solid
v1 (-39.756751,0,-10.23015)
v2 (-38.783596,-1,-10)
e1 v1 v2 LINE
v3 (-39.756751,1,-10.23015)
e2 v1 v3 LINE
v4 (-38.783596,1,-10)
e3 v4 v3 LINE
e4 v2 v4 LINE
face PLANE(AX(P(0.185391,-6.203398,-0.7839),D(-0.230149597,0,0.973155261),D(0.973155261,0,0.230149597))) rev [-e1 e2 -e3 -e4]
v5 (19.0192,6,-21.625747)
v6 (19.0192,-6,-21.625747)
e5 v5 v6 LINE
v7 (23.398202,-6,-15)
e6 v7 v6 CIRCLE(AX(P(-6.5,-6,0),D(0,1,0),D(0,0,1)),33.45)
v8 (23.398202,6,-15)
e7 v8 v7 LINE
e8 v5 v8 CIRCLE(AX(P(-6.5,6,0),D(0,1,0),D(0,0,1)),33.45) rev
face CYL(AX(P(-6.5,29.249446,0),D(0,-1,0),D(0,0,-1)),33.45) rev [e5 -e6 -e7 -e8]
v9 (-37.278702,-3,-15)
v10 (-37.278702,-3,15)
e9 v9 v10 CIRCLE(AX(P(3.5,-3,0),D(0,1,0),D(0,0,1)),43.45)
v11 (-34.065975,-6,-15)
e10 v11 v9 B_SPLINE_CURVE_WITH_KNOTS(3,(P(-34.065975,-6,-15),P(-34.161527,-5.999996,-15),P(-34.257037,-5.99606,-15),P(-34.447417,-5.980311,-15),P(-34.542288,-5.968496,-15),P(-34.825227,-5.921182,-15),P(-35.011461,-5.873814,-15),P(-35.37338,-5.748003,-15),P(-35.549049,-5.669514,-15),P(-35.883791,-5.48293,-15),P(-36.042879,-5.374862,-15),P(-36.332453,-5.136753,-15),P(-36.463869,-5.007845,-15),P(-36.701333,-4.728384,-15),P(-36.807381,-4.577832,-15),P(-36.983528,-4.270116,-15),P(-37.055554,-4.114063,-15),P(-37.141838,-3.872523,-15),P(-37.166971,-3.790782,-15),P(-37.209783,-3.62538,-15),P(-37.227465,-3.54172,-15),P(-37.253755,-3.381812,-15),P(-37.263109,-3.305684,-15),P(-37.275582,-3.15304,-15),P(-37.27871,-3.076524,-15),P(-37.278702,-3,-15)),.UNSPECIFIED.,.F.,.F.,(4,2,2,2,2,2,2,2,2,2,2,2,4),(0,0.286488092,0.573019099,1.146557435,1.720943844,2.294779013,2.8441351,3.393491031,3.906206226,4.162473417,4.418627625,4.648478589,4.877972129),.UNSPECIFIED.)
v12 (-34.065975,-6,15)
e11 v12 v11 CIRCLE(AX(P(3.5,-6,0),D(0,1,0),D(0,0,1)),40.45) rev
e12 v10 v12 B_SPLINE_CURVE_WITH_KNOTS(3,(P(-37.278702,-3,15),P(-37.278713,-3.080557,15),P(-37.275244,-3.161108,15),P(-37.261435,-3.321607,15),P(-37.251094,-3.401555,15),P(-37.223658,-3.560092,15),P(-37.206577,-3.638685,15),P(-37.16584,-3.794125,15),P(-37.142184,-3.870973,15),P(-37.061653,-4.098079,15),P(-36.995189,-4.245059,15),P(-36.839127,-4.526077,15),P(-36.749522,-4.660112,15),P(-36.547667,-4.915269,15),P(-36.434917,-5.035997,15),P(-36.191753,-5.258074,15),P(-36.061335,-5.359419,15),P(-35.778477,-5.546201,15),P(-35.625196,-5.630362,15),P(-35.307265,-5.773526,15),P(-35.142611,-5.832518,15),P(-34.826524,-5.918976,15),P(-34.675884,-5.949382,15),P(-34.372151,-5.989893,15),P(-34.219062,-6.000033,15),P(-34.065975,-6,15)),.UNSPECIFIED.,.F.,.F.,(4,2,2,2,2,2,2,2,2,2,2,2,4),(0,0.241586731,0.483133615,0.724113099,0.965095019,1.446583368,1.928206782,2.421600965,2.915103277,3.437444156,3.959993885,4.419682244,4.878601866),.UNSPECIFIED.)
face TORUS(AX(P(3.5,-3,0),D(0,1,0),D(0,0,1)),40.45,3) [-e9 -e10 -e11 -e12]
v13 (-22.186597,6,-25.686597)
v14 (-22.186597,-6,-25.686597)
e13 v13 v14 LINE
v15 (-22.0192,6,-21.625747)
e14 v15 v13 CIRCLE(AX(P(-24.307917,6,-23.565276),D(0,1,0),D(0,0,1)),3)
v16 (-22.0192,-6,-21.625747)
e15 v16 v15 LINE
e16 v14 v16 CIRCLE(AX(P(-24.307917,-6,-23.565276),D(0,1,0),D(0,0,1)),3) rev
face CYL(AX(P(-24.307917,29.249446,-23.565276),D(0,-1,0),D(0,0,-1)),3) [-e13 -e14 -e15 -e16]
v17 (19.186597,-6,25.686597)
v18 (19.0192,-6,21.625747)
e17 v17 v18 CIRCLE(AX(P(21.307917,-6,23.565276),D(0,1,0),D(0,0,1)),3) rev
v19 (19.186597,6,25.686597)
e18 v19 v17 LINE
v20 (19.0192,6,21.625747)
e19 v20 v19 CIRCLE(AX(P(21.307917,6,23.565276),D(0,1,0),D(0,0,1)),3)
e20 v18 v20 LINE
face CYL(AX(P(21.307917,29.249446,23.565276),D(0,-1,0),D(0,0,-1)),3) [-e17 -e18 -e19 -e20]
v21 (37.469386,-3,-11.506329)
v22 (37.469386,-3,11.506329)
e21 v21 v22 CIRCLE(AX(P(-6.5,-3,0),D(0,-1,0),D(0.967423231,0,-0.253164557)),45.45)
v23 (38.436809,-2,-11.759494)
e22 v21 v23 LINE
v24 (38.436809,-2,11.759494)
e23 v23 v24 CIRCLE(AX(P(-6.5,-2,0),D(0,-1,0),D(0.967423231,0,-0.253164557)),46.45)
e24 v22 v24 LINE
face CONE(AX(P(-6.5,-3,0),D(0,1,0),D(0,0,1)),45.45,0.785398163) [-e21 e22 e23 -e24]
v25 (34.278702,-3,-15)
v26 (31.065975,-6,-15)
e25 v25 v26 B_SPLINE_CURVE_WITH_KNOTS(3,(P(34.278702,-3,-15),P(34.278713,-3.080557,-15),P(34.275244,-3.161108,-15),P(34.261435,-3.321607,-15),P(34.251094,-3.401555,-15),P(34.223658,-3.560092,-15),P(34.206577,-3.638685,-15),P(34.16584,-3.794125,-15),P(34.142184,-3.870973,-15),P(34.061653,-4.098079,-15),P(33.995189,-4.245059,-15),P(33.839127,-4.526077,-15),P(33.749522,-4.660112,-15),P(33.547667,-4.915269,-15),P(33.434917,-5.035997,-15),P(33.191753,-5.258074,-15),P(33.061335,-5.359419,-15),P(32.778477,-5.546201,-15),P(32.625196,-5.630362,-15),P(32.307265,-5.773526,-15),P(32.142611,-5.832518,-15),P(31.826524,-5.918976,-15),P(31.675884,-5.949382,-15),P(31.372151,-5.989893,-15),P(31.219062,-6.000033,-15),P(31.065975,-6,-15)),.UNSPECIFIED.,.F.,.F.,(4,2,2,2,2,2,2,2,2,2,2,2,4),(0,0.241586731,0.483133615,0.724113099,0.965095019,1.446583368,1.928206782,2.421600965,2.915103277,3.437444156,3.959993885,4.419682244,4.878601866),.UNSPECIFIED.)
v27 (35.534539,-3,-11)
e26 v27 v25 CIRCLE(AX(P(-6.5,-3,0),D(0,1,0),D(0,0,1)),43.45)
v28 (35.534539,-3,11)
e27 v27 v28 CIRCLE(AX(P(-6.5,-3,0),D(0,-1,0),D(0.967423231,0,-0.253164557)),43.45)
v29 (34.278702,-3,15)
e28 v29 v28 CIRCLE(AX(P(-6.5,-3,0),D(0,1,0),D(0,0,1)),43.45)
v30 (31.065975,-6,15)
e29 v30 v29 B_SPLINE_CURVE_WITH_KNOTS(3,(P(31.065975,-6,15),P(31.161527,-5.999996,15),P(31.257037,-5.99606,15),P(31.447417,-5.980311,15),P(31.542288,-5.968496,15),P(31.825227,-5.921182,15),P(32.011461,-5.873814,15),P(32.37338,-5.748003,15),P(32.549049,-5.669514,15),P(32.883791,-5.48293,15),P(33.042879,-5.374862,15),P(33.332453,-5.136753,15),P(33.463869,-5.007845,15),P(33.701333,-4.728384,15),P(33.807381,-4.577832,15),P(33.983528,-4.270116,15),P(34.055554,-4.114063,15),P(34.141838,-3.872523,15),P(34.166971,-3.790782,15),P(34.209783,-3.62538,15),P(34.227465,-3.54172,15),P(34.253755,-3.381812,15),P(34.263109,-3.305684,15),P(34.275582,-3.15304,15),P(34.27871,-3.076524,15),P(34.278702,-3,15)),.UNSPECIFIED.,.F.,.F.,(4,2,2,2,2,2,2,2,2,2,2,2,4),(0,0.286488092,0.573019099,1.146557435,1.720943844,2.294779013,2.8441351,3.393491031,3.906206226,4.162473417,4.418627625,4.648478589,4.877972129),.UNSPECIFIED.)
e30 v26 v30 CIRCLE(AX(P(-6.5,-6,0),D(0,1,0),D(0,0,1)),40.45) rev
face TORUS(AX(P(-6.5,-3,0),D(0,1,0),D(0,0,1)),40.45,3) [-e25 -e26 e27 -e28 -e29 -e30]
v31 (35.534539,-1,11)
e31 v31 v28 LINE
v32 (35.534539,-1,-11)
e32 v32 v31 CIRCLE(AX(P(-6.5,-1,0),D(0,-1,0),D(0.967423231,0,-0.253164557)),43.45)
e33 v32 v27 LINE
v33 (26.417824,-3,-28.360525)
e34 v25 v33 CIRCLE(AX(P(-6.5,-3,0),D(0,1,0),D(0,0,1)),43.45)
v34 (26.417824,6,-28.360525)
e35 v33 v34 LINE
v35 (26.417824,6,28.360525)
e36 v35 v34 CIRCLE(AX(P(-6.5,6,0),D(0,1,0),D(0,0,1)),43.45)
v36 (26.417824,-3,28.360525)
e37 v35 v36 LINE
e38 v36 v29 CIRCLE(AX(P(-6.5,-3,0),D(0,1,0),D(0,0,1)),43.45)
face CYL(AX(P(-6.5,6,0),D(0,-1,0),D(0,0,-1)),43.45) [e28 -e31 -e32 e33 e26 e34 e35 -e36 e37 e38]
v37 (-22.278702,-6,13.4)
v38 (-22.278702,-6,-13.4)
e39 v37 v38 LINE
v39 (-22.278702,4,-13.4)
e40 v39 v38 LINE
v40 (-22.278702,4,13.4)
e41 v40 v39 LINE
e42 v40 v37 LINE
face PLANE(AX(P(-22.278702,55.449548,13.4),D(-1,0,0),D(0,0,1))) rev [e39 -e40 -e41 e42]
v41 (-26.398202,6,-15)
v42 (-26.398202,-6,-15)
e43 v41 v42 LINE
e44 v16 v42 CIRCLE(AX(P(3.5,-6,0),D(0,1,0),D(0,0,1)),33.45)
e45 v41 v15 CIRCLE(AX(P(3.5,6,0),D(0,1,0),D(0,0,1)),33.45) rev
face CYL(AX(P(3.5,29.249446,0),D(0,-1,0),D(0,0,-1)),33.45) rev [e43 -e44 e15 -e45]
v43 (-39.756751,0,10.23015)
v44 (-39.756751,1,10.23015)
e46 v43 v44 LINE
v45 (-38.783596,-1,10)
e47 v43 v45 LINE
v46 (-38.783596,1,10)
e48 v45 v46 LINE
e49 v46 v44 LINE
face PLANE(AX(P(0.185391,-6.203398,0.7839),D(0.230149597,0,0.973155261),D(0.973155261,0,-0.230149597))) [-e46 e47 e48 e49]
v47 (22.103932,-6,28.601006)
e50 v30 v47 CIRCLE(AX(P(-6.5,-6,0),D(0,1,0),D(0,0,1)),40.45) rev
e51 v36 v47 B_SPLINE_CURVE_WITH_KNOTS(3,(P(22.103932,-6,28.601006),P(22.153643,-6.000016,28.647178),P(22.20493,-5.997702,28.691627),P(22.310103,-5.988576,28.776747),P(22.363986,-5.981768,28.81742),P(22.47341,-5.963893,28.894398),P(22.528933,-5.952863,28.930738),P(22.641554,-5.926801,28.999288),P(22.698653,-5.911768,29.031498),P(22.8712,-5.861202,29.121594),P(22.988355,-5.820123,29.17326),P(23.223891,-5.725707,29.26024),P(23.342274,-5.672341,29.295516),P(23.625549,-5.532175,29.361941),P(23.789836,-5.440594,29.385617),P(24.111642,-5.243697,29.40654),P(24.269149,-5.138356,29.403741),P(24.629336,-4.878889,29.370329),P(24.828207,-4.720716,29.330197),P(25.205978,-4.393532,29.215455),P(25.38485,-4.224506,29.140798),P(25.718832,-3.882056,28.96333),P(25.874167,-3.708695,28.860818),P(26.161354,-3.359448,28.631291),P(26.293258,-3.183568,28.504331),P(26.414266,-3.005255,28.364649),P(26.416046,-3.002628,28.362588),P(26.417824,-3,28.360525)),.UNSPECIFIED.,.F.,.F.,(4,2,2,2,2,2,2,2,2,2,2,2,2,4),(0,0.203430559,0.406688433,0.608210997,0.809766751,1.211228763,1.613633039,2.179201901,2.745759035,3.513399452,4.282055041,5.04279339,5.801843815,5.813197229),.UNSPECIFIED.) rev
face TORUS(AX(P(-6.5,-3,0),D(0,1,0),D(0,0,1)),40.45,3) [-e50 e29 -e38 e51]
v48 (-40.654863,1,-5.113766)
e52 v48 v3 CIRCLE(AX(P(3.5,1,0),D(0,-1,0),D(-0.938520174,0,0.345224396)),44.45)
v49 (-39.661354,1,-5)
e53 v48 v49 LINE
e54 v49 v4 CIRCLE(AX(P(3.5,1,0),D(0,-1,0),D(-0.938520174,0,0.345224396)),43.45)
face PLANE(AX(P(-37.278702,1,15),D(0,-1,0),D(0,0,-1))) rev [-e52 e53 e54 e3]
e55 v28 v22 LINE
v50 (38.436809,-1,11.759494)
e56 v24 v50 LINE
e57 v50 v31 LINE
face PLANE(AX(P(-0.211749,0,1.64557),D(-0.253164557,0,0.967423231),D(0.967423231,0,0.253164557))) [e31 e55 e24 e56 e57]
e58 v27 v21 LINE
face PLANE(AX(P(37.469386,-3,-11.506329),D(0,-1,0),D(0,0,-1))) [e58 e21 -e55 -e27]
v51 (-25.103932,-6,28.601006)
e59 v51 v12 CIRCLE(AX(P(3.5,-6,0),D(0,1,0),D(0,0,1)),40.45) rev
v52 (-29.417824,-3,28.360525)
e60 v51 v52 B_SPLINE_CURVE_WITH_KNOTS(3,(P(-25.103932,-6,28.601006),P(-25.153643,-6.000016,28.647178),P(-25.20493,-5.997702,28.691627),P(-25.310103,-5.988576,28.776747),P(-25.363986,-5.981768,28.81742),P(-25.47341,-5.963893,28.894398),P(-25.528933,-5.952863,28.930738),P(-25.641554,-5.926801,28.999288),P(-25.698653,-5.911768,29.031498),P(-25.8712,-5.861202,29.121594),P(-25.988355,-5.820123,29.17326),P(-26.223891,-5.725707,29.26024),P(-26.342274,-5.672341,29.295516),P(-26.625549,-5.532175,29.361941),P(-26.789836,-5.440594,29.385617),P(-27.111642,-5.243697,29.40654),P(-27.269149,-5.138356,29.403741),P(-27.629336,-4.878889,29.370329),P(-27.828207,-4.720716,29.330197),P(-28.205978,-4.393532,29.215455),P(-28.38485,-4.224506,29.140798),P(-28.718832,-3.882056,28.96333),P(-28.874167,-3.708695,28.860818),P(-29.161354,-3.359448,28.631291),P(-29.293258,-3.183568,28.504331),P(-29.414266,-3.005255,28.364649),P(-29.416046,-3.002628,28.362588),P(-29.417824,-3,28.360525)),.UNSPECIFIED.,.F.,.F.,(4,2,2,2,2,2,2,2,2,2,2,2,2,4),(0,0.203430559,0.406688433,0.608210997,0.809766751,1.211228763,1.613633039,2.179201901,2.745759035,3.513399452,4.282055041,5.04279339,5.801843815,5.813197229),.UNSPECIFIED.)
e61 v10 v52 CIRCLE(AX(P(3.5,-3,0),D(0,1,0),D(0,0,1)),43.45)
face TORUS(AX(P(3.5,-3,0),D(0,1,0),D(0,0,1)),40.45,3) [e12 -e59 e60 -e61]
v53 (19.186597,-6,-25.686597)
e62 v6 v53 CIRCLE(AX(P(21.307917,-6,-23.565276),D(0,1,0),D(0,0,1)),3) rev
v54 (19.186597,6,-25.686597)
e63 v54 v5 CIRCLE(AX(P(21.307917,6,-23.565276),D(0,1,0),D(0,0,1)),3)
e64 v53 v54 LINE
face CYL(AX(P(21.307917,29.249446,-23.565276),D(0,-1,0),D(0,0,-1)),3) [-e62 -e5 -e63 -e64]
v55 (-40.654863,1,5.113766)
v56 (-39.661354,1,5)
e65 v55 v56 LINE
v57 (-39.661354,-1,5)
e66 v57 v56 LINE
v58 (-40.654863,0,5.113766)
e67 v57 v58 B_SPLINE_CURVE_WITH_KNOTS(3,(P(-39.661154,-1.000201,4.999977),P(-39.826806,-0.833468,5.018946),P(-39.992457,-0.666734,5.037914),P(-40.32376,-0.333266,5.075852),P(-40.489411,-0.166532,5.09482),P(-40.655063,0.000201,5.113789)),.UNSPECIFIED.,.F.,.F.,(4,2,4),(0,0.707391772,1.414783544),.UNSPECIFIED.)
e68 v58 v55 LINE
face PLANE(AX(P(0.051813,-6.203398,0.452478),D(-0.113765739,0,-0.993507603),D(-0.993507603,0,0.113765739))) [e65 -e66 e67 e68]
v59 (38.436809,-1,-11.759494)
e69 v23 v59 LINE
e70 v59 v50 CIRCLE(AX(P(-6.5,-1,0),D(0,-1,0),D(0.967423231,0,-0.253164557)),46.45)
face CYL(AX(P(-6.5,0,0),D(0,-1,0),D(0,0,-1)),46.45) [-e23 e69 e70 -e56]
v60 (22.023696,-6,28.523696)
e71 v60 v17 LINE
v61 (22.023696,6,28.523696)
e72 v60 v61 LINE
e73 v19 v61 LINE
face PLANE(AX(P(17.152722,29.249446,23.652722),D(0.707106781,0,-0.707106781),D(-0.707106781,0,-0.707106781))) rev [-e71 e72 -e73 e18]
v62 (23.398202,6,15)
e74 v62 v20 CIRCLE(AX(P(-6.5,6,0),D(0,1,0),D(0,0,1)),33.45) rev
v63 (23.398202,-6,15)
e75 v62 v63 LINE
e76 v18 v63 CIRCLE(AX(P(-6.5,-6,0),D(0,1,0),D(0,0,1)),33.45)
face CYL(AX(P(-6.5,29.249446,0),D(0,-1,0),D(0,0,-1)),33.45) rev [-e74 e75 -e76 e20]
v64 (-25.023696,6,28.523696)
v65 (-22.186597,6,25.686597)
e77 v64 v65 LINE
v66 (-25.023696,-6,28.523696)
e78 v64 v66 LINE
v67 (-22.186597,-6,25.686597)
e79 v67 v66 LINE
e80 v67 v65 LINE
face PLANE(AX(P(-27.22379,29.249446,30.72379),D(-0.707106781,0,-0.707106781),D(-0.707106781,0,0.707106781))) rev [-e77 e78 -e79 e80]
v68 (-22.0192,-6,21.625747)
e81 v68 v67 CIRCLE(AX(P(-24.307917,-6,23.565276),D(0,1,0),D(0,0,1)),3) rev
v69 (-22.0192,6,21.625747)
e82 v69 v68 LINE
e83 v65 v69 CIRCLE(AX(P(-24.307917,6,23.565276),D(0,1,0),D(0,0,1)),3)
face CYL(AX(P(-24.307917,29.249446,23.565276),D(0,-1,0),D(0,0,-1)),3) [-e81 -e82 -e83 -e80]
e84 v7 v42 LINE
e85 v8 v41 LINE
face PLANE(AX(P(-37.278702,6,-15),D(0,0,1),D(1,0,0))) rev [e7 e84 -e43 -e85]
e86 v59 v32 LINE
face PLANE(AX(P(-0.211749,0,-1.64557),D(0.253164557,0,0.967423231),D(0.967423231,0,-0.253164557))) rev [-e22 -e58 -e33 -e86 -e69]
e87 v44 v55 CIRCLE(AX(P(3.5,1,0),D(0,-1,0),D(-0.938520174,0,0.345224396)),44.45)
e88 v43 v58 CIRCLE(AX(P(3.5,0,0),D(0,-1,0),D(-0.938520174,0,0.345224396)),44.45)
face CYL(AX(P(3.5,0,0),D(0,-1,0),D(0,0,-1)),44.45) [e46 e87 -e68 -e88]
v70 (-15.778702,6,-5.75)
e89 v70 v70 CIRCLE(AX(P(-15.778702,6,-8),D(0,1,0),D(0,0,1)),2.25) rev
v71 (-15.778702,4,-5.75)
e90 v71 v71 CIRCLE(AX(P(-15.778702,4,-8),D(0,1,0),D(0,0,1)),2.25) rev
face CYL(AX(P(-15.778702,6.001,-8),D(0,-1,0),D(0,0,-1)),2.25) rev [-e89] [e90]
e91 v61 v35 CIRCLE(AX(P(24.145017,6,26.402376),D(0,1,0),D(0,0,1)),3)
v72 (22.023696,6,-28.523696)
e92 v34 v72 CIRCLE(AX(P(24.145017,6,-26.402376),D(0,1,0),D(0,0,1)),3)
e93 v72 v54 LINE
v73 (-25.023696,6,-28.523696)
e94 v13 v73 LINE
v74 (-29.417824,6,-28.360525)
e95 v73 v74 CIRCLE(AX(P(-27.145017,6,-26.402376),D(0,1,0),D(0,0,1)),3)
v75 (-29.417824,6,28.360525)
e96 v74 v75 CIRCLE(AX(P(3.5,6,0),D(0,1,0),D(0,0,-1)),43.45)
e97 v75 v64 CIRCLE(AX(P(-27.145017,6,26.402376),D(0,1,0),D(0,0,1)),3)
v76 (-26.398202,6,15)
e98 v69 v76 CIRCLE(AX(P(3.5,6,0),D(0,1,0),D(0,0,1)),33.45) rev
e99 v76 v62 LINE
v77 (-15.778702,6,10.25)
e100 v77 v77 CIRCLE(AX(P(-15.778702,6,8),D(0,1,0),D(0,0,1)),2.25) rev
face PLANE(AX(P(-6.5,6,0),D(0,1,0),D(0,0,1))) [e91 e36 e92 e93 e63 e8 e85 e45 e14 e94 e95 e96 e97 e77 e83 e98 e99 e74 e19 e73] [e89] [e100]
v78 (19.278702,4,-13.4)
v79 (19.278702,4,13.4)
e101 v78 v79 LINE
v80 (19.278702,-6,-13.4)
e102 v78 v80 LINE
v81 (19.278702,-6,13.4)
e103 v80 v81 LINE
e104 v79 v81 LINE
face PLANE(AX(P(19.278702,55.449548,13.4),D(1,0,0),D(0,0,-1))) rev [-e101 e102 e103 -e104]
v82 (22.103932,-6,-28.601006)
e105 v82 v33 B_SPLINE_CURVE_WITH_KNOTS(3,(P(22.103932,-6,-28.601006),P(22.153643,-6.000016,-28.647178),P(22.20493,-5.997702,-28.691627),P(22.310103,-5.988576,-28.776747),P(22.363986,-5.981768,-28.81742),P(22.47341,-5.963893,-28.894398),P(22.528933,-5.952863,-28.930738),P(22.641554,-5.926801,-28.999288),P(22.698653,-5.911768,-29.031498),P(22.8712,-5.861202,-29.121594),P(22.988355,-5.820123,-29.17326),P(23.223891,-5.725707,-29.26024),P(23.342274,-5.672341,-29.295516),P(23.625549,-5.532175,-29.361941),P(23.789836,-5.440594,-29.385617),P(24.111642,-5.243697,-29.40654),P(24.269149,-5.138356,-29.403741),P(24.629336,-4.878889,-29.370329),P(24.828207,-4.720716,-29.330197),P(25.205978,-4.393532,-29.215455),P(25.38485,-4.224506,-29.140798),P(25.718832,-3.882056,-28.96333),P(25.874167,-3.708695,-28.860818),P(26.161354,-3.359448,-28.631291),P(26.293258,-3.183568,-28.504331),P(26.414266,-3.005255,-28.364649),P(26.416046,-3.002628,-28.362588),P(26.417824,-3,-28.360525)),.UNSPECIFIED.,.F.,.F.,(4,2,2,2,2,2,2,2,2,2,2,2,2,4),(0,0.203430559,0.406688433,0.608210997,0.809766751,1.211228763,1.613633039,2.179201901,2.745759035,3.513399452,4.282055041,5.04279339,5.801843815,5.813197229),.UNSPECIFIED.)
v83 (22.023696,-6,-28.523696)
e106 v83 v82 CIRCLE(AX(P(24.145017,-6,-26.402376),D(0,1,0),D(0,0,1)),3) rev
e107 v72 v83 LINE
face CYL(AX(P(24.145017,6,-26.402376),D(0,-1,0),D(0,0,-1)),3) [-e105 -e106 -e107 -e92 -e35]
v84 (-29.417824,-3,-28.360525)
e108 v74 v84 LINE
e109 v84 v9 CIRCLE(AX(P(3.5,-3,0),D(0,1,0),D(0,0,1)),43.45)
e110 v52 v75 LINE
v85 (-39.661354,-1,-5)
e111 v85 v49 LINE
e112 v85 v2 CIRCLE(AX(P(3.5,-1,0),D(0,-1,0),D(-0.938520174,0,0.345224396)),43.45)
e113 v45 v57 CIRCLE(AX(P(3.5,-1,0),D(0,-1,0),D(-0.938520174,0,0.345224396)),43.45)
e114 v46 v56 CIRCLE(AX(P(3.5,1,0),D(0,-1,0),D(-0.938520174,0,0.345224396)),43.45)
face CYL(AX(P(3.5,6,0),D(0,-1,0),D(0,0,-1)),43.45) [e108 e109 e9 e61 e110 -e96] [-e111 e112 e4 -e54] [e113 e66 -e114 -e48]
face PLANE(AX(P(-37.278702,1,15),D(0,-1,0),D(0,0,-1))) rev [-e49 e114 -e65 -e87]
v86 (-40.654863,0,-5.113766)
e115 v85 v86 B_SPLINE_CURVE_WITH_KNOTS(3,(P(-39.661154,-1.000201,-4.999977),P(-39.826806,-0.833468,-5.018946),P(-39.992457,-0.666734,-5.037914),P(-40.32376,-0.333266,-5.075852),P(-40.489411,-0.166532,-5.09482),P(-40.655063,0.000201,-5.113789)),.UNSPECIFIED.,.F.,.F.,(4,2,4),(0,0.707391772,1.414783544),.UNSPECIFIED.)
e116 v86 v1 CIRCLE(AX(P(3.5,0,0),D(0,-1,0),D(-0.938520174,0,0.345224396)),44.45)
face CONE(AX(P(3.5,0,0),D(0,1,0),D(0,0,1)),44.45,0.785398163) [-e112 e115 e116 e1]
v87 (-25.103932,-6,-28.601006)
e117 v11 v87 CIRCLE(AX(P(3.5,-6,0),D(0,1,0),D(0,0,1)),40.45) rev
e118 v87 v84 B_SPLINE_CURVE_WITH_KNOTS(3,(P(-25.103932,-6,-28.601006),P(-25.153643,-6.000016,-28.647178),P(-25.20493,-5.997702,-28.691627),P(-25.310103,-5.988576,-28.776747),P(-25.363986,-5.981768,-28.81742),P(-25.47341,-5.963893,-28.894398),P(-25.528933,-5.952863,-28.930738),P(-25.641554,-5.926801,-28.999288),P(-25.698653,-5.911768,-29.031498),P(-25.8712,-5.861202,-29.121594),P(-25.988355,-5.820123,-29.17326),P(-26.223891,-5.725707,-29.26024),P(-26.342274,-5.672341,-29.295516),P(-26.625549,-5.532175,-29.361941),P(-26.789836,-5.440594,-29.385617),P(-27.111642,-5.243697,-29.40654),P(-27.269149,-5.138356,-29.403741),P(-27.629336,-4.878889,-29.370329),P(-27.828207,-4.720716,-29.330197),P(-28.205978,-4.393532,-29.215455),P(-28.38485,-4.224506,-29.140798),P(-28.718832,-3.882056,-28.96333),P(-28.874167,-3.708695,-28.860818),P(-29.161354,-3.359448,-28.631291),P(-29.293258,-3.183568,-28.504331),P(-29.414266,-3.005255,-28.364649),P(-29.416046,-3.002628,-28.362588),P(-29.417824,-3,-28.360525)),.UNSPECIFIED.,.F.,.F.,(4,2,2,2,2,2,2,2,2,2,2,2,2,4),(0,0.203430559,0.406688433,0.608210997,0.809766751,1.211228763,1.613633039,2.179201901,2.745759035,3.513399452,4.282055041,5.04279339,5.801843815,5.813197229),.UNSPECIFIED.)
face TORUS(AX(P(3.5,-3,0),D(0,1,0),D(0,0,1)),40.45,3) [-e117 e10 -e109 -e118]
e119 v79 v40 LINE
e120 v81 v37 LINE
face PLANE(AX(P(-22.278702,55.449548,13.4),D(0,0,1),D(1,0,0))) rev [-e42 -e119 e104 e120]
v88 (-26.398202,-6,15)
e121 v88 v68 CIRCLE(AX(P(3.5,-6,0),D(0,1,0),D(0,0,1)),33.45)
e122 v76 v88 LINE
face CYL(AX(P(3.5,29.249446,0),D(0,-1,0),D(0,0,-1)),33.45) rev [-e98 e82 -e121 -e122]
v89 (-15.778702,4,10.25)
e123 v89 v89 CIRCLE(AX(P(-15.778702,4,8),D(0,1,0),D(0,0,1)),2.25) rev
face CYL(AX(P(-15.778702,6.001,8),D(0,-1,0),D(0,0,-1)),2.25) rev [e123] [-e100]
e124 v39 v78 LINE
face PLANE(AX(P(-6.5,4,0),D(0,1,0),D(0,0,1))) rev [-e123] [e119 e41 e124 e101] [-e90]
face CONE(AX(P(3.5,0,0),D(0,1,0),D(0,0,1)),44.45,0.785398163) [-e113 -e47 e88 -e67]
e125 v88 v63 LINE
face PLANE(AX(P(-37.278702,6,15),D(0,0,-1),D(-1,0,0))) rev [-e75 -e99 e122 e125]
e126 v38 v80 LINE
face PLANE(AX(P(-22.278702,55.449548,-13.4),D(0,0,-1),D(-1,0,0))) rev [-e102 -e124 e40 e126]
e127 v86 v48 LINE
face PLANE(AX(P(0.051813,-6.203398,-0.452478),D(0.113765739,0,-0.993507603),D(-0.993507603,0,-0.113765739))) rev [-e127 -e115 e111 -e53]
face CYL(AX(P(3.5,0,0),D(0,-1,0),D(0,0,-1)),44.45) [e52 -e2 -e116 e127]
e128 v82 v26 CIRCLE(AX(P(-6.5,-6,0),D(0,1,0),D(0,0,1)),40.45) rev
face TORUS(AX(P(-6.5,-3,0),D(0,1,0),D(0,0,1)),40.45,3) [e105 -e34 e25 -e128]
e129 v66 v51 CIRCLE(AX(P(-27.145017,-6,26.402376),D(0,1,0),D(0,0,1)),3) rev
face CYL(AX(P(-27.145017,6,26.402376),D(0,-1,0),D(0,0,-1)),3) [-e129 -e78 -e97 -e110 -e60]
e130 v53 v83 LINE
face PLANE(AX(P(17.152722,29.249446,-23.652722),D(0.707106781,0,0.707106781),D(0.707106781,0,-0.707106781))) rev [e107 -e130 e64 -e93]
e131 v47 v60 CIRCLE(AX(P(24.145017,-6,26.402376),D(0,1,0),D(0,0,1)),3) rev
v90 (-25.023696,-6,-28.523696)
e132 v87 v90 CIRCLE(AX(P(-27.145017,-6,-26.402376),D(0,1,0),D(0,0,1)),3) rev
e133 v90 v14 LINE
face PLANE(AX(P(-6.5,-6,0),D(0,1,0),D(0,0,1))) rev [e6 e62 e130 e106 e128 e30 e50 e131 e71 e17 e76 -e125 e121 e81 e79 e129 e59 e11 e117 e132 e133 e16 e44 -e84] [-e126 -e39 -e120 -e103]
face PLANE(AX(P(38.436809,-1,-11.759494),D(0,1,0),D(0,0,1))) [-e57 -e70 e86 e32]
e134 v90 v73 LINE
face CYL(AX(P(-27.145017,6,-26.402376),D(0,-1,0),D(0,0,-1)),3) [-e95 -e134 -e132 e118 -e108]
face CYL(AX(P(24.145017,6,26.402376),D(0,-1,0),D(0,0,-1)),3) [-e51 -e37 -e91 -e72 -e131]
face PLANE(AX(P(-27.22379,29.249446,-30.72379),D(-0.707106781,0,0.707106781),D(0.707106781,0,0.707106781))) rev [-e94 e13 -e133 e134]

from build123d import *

# Parameters (mm, degrees)
BOSS_EXTRUDE1_DEPTH = 6
CUT_EXTRUDE3_REACH  = 46.328
SKETCH4_R           = 2.249999999999999
CUT_EXTRUDE5_DEPTH  = 10
FILLET2_R           = 3
CUT_EXTRUDE4_DEPTH  = 46.34730878629092
BOSS_EXTRUDE2_START = -6
BOSS_EXTRUDE2_DEPTH = 12
FILLET1_R           = 3


with BuildPart() as part:
    # Sketch1 → Boss-Extrude1 (new, symmetric)
    with BuildSketch(Plane(origin=(0, 0, 0), x_dir=(1, 0, 0), z_dir=(0, 1, 0))):
        with BuildLine():
            Line((-37.27870154872519, 15), (34.27870154872519, 15.000000000000009))
            ThreePointArc((34.27870154872519, 15.000000000000009), (36.950000000000024, -1.22e-15), (34.27870154872519, -15.000000000000009))
            Line((34.27870154872519, -15.000000000000009), (-37.27870154872519, -15))
            ThreePointArc((-37.27870154872519, -15), (-39.95000000000003, -5.32e-15), (-37.27870154872519, 15))
        make_face()
    extrude(amount=BOSS_EXTRUDE1_DEPTH, both=True)

    # Sketch4 → Cut-Extrude3 (cut, up to next)
    with BuildSketch(Plane.XZ.offset(6), mode=Mode.PRIVATE) as cut_extrude3_sk1:
        with Locations(Location((-15.7787015487252, 7.999999999999995, 0), (0, 0, 270))):
            Circle(SKETCH4_R)
    cut_extrude3_tool1 = extrude(cut_extrude3_sk1.sketch, amount=-CUT_EXTRUDE3_REACH, mode=Mode.PRIVATE) & part.part
    # Sketch4 → Cut-Extrude3 (cut, up to next)
    with BuildSketch(Plane.XZ.offset(6), mode=Mode.PRIVATE) as cut_extrude3_sk2:
        with Locations(Location((-15.778701548725197, -8.000000000000009, 0), (0, 0, 270))):
            Circle(SKETCH4_R)
    cut_extrude3_tool2 = extrude(cut_extrude3_sk2.sketch, amount=-CUT_EXTRUDE3_REACH, mode=Mode.PRIVATE) & part.part
    add(cut_extrude3_tool1.solids().sort_by_distance((-15.778702, -6, 8))[0], mode=Mode.SUBTRACT)
    add(cut_extrude3_tool2.solids().sort_by_distance((-15.778702, -6, -8))[0], mode=Mode.SUBTRACT)

    # Sketch12 → Cut-Extrude5 (cut)
    with BuildSketch(Plane.XZ.offset(6)):
        Polygon((-22.278701548725184, 13.399999999999999), (19.278701548725188, 13.399999999999999), (19.278701548725188, -13.400000000000007), (-22.27870154872518, -13.400000000000007), align=None)
    extrude(amount=-CUT_EXTRUDE5_DEPTH, mode=Mode.SUBTRACT)

    # Fillet2
    fillet2_edges = [part.edges().sort_by_distance(p)[0] for p in [
        (-39.95000000000003, -6, 8.9e-16),
        (36.95000000000002, -6, 4.4e-16),
    ]]
    fillet(fillet2_edges, radius=FILLET2_R)

    # Sweep1: sweep along a path in Sketch6
    with BuildLine(Plane(origin=(0, 0, 0), x_dir=(1, 0, 0), z_dir=(0, 1, 0))) as sweep1_path:
        ThreePointArc((-37.278701548725195, 14.999999999999964), (-39.95000000000002, -1.397e-14), (-37.27870154872519, -15))
    # Sketch5 → Sweep1 (sweep)
    with BuildSketch(Plane.XY):
        Polygon((-39.95000000000002, -0.9999999999999925), (-39.95000000000002, 1.0000000000000122), (-40.950000000000024, 1.000000000000012), (-40.95000000000002, 1.193e-14), align=None)
    sweep(path=sweep1_path.line)

    # Sketch7 → Cut-Extrude4 (cut, through all)
    with BuildSketch(Plane(origin=(0, 6, 0), x_dir=(1, 0, 0), z_dir=(0, 1, 0))):
        with BuildLine():
            ThreePointArc((-38.21722172245879, 15.345224395857285), (-39.06389342380726, 12.810834344677886), (-39.756751371527066, 10.230149597239155))
            Line((-39.75675137152708, 10.230149597239159), (-38.783596110075614, 10.000000000000009))
            ThreePointArc((-38.78359611007561, 10.000000000000005), (-38.106325517759984, 12.52262659789053), (-37.27870154872519, 14.999999999999984))
            Line((-37.27870154872519, 14.999999999999982), (-38.217221722458795, 15.345224395857288))
        make_face()
        with BuildLine():
            Line((-39.6613542419605, 5.000000000000006), (-40.65486268777063, 5.113765835871163))
            ThreePointArc((-40.65486268777062, 5.11376583587116), (-40.95, -1.11e-14), (-40.65486268777061, -5.113765835871172))
            Line((-40.65486268777063, -5.113765835871174), (-39.6613542419605, -4.999999999999996))
            ThreePointArc((-39.66135424196049, -4.999999999999993), (-39.95000000000002, 7.11e-15), (-39.661354241960495, 5.000000000000009))
        make_face()
        with BuildLine():
            Line((-38.783596110075614, -9.999999999999998), (-39.75675137152708, -10.23014959723917))
            ThreePointArc((-39.75675137152705, -10.230149597239167), (-39.06389342380725, -12.810834344677888), (-38.217221722458795, -15.345224395857272))
            Line((-38.2172217224588, -15.345224395857272), (-37.27870154872519, -14.999999999999964))
            ThreePointArc((-37.27870154872519, -14.999999999999964), (-38.10632551776, -12.522626597890516), (-38.78359611007561, -9.999999999999996))
        make_face()
    extrude(amount=-CUT_EXTRUDE4_DEPTH, mode=Mode.SUBTRACT)

    # Sweep2: sweep along a path in Sketch10
    with BuildLine(Plane(origin=(0, 0, 0), x_dir=(1, 0, 0), z_dir=(0, 1, 0))) as sweep2_path:
        ThreePointArc((35.53453936942811, -10.999999999999996), (36.95000000000002, 6.01e-15), (35.53453936942811, 11.000000000000009))
    # Sketch9 → Sweep2 (sweep)
    with BuildSketch(Plane.XY):
        Polygon((39.950000000000024, -2.000000000000001), (38.95000000000003, -3.000000000000001), (36.950000000000024, -3.000000000000001), (36.950000000000024, -1.0000000000000013), (39.950000000000024, -1.000000000000001), align=None)
    sweep(path=sweep2_path.line)

    # Sketch11 → Boss-Extrude2 (add)
    with BuildSketch(Plane(origin=(0, 0, 0), x_dir=(1, 0, 0), z_dir=(0, 1, 0)).offset(BOSS_EXTRUDE2_START)):
        with BuildLine():
            Line((-27.22378964255568, 30.72378964255532), (-20.152721830690165, 23.652721830689885))
            ThreePointArc((-20.152721830690165, 23.652721830689885), (-23.622735246228356, 19.577020528236766), (-26.39820228709416, 14.999999999999972))
            Line((-26.39820228709416, 14.999999999999972), (-37.278701548725195, 14.999999999999964))
            ThreePointArc((-37.278701548725195, 14.999999999999964), (-33.105477074075026, 23.408151319131726), (-27.22378964255568, 30.72378964255532))
        make_face()
        with BuildLine():
            Line((17.152721830690172, 23.652721830689885), (24.22378964255568, 30.72378964255532))
            ThreePointArc((24.22378964255568, 30.72378964255532), (30.10547707407503, 23.40815131913176), (34.27870154872519, 15.000000000000009))
            Line((34.27870154872519, 15.000000000000009), (23.39820228709414, 15.000000000000002))
            ThreePointArc((23.39820228709414, 15.000000000000002), (20.622735246228352, 19.577020528236762), (17.152721830690172, 23.652721830689885))
        make_face()
        with BuildLine():
            Line((34.27870154872519, -15.000000000000009), (23.39820228709414, -15.000000000000002))
            ThreePointArc((23.39820228709414, -15.000000000000002), (20.62273524622831, -19.577020528236723), (17.152721830690172, -23.652721830689885))
            Line((17.152721830690172, -23.652721830689885), (24.22378964255568, -30.72378964255532))
            ThreePointArc((24.22378964255568, -30.72378964255532), (30.105477074074965, -23.40815131913171), (34.27870154872519, -15.000000000000009))
        make_face()
        with BuildLine():
            Line((-37.278701548725195, -14.999999999999964), (-26.39820228709416, -14.999999999999972))
            ThreePointArc((-26.39820228709416, -14.999999999999972), (-23.622735246228356, -19.577020528236766), (-20.152721830690165, -23.652721830689885))
            Line((-20.152721830690165, -23.652721830689885), (-27.22378964255568, -30.72378964255532))
            ThreePointArc((-27.22378964255568, -30.72378964255532), (-33.105477074075026, -23.408151319131726), (-37.278701548725195, -14.999999999999964))
        make_face()
    extrude(amount=BOSS_EXTRUDE2_DEPTH)

    # Fillet1
    # the kernel refuses this fillet: 3 mm, written as the material it takes off along each edge
    with BuildSketch(Plane(origin=(-27.223789642555676, -14.061794859846085, -30.723789642555325), x_dir=(-0.6803801743920825, 0, 0.7328593441406063), z_dir=(0, 1, 0))) as fillet1_piece_1:
        with BuildLine():
            CenterArc((3.113392813537799, 2.997933740985829), FILLET1_R, 177.87335835873736, 94.25328328252505)
            Line((0.11545907255197221, 3.109258871386477), (0, 0))
            ThreePointArc((0, 0), (1.6123589719692206, -0.02992631805525288), (3.224717943938434, -1.4e-16))
        make_face()
    extrude(amount=28.12358971969217, mode=Mode.SUBTRACT)
    with BuildSketch(Plane(origin=(-20.15272183069017, -13.190833558911974, -23.652721830689885), x_dir=(-0.7071067811865506, 0, -0.7071067811865444), z_dir=(0, 1, 0))) as fillet1_piece_2:
        with BuildLine():
            CenterArc((2.8763334235647875, 2.9999999999999987), FILLET1_R, 184.721042367865, 85.27895763213502)
            ThreePointArc((-0.11348825738704518, 2.753086419753086), (-0.02838410706026842, 1.3777122721375448), (0, 0))
            Line((0, 0), (2.8763334235647893, -3e-17))
        make_face()
    extrude(amount=26.38166711782395, mode=Mode.SUBTRACT)
    with BuildSketch(Plane(origin=(3.5000000000005986, -6, 3.9257e-13), x_dir=(-0.983868674569183, 0, -0.1788922334856356), z_dir=(-0.1788922334856356, 0, 0.983868674569183))) as fillet1_piece_3:
        with BuildLine():
            CenterArc((43.45000000000071 - FILLET1_R, -FILLET1_R), FILLET1_R, 8.48e-15, 90)
            Line((43.45000000000071, -FILLET1_R), (43.45000000000071, 0))
            Line((43.45000000000071, 0), (43.45000000000071 - FILLET1_R, 0))
        make_face()
    revolve(axis=Axis((3.5000000000005986, -6, 3.9257e-13), (0, -1, 0)), revolution_arc=44.58500993548746, mode=Mode.SUBTRACT)
    with BuildSketch(Plane(origin=(17.15272183069017, -13.190833558911962, -23.652721830689885), x_dir=(0.6773830058582131, 0, 0.7356305209644934), z_dir=(0, 1, 0))) as fillet1_piece_4:
        with BuildLine():
            CenterArc((2.878986183031824, 2.9974543401739657), FILLET1_R, 182.3605211839325, 85.27895763213502)
            Line((-0.11846815714214187, 2.873892701417236), (0, 0))
            ThreePointArc((0, 0), (1.3777122721375474, 0.02838410706027035), (2.7554245442750958, 2e-17))
        make_face()
    extrude(amount=26.381667117823923, mode=Mode.SUBTRACT)
    with BuildSketch(Plane(origin=(24.22378964255568, -14.06179485984604, -30.72378964255532), x_dir=(-0.707106781186551, 0, 0.7071067811865441), z_dir=(0, 1, 0))) as fillet1_piece_5:
        with BuildLine():
            CenterArc((3.1114018587655967, 2.9999999999999996), FILLET1_R, 175.7467167174752, 94.25328328252476)
            ThreePointArc((0.11966404853807312, 3.222496909765141), (0.02992631805525848, 1.6123589719692129), (0, 0))
            Line((0, 0), (3.1114018587655963, 1.6e-16))
        make_face()
    extrude(amount=28.123589719692085, mode=Mode.SUBTRACT)
    with BuildSketch(Plane(origin=(-6.4999999999996945, -6, -1.6342e-13), x_dir=(0.5751444375352646, 0, -0.8180518785335342), z_dir=(-0.8180518785335342, 0, -0.5751444375352646))) as fillet1_piece_6:
        with BuildLine():
            CenterArc((43.44999999999968 - FILLET1_R, -FILLET1_R), FILLET1_R, 8.48e-15, 90)
            Line((43.44999999999968, -FILLET1_R), (43.44999999999968, 0))
            Line((43.44999999999968, 0), (43.44999999999968 - FILLET1_R, 0))
        make_face()
    revolve(axis=Axis((-6.4999999999996945, -6, -1.6342e-13), (0, -1, 0)), revolution_arc=44.58500993548848, mode=Mode.SUBTRACT)
    with BuildSketch(Plane(origin=(24.22378964255568, -14.061794859846156, 30.723789642555325), x_dir=(-0.7071067811865503, 0, -0.7071067811865447), z_dir=(0, 1, 0))) as fillet1_piece_7:
        with BuildLine():
            CenterArc((3.1114018587656367, -2.999999999999999), FILLET1_R, 90.00000000000006, 94.25328328252562)
            ThreePointArc((0.1196640485381212, -3.222496909765186), (0.02992631805528244, -1.6123589719692302), (0, 0))
            Line((0, 0), (3.1114018587656336, 8e-17))
        make_face()
    extrude(amount=28.12358971969231, mode=Mode.SUBTRACT)
    with BuildSketch(Plane(origin=(17.152721830690176, -13.190833558911836, 23.652721830689888), x_dir=(0.6773830058582013, 0, -0.7356305209645043), z_dir=(0, 1, 0))) as fillet1_piece_8:
        with BuildLine():
            CenterArc((2.8789861830317705, -2.9974543401739693), FILLET1_R, 92.36052118393214, 85.2789576321343)
            Line((-0.11846815714219594, -2.8738927014171836), (0, 0))
            ThreePointArc((0, 0), (1.377712272137523, -0.02838410706026628), (2.75542454427506, -1.6e-16))
        make_face()
    extrude(amount=26.381667117823667, mode=Mode.SUBTRACT)
    with BuildSketch(Plane(origin=(-6.500000000002743, -6, -1.78524e-12), x_dir=(0.5751444375352907, 0, 0.8180518785335158), z_dir=(-0.8180518785335158, 0, 0.5751444375352907))) as fillet1_piece_9:
        with BuildLine():
            CenterArc((43.45000000000323 - FILLET1_R, FILLET1_R), FILLET1_R, 270, 89.99999999999999)
            Line((43.45000000000323, FILLET1_R), (43.45000000000323, 0))
            Line((43.45000000000323, 0), (43.45000000000323 - FILLET1_R, 0))
        make_face()
    revolve(axis=Axis((-6.500000000002743, -6, -1.78524e-12), (0, 1, 0)), revolution_arc=44.58500993548482, mode=Mode.SUBTRACT)
    with BuildSketch(Plane(origin=(-27.223789642555676, -14.06179485984606, 30.723789642555317), x_dir=(0.7071067811865516, 0, -0.7071067811865436), z_dir=(0, 1, 0))) as fillet1_piece_10:
        with BuildLine():
            CenterArc((3.1114018587656043, 3.0000000000000018), FILLET1_R, 175.7467167174751, 94.25328328252488)
            ThreePointArc((0.11966404853808318, 3.2224969097651486), (0.02992631805526974, 1.6123589719692102), (0, 0))
            Line((0, 0), (3.111401858765604, -1e-16))
        make_face()
    extrude(amount=28.12358971969212, mode=Mode.SUBTRACT)
    with BuildSketch(Plane(origin=(-20.15272183069017, -13.190833558911962, 23.652721830689885), x_dir=(-0.6773830058582145, 0, -0.7356305209644921), z_dir=(0, 1, 0))) as fillet1_piece_11:
        with BuildLine():
            CenterArc((2.8789861830318295, 2.9974543401739657), FILLET1_R, 182.36052118393246, 85.27895763213508)
            Line((-0.11846815714213627, 2.8738927014172364), (0, 0))
            ThreePointArc((0, 0), (1.3777122721375523, 0.02838410706027291), (2.7554245442751006, -2e-17))
        make_face()
    extrude(amount=26.381667117823923, mode=Mode.SUBTRACT)
    with BuildSketch(Plane(origin=(3.5000000000005986, -6, -3.9257e-13), x_dir=(-0.5751444375352724, 0, 0.8180518785335287), z_dir=(0.8180518785335287, 0, 0.5751444375352724))) as fillet1_piece_12:
        with BuildLine():
            CenterArc((43.45000000000071 - FILLET1_R, -FILLET1_R), FILLET1_R, 8.48e-15, 90)
            Line((43.45000000000071, -FILLET1_R), (43.45000000000071, 0))
            Line((43.45000000000071, 0), (43.45000000000071 - FILLET1_R, 0))
        make_face()
    revolve(axis=Axis((3.5000000000005986, -6, -3.9257e-13), (0, -1, 0)), revolution_arc=44.58500993548747, mode=Mode.SUBTRACT)


solid = part.part
